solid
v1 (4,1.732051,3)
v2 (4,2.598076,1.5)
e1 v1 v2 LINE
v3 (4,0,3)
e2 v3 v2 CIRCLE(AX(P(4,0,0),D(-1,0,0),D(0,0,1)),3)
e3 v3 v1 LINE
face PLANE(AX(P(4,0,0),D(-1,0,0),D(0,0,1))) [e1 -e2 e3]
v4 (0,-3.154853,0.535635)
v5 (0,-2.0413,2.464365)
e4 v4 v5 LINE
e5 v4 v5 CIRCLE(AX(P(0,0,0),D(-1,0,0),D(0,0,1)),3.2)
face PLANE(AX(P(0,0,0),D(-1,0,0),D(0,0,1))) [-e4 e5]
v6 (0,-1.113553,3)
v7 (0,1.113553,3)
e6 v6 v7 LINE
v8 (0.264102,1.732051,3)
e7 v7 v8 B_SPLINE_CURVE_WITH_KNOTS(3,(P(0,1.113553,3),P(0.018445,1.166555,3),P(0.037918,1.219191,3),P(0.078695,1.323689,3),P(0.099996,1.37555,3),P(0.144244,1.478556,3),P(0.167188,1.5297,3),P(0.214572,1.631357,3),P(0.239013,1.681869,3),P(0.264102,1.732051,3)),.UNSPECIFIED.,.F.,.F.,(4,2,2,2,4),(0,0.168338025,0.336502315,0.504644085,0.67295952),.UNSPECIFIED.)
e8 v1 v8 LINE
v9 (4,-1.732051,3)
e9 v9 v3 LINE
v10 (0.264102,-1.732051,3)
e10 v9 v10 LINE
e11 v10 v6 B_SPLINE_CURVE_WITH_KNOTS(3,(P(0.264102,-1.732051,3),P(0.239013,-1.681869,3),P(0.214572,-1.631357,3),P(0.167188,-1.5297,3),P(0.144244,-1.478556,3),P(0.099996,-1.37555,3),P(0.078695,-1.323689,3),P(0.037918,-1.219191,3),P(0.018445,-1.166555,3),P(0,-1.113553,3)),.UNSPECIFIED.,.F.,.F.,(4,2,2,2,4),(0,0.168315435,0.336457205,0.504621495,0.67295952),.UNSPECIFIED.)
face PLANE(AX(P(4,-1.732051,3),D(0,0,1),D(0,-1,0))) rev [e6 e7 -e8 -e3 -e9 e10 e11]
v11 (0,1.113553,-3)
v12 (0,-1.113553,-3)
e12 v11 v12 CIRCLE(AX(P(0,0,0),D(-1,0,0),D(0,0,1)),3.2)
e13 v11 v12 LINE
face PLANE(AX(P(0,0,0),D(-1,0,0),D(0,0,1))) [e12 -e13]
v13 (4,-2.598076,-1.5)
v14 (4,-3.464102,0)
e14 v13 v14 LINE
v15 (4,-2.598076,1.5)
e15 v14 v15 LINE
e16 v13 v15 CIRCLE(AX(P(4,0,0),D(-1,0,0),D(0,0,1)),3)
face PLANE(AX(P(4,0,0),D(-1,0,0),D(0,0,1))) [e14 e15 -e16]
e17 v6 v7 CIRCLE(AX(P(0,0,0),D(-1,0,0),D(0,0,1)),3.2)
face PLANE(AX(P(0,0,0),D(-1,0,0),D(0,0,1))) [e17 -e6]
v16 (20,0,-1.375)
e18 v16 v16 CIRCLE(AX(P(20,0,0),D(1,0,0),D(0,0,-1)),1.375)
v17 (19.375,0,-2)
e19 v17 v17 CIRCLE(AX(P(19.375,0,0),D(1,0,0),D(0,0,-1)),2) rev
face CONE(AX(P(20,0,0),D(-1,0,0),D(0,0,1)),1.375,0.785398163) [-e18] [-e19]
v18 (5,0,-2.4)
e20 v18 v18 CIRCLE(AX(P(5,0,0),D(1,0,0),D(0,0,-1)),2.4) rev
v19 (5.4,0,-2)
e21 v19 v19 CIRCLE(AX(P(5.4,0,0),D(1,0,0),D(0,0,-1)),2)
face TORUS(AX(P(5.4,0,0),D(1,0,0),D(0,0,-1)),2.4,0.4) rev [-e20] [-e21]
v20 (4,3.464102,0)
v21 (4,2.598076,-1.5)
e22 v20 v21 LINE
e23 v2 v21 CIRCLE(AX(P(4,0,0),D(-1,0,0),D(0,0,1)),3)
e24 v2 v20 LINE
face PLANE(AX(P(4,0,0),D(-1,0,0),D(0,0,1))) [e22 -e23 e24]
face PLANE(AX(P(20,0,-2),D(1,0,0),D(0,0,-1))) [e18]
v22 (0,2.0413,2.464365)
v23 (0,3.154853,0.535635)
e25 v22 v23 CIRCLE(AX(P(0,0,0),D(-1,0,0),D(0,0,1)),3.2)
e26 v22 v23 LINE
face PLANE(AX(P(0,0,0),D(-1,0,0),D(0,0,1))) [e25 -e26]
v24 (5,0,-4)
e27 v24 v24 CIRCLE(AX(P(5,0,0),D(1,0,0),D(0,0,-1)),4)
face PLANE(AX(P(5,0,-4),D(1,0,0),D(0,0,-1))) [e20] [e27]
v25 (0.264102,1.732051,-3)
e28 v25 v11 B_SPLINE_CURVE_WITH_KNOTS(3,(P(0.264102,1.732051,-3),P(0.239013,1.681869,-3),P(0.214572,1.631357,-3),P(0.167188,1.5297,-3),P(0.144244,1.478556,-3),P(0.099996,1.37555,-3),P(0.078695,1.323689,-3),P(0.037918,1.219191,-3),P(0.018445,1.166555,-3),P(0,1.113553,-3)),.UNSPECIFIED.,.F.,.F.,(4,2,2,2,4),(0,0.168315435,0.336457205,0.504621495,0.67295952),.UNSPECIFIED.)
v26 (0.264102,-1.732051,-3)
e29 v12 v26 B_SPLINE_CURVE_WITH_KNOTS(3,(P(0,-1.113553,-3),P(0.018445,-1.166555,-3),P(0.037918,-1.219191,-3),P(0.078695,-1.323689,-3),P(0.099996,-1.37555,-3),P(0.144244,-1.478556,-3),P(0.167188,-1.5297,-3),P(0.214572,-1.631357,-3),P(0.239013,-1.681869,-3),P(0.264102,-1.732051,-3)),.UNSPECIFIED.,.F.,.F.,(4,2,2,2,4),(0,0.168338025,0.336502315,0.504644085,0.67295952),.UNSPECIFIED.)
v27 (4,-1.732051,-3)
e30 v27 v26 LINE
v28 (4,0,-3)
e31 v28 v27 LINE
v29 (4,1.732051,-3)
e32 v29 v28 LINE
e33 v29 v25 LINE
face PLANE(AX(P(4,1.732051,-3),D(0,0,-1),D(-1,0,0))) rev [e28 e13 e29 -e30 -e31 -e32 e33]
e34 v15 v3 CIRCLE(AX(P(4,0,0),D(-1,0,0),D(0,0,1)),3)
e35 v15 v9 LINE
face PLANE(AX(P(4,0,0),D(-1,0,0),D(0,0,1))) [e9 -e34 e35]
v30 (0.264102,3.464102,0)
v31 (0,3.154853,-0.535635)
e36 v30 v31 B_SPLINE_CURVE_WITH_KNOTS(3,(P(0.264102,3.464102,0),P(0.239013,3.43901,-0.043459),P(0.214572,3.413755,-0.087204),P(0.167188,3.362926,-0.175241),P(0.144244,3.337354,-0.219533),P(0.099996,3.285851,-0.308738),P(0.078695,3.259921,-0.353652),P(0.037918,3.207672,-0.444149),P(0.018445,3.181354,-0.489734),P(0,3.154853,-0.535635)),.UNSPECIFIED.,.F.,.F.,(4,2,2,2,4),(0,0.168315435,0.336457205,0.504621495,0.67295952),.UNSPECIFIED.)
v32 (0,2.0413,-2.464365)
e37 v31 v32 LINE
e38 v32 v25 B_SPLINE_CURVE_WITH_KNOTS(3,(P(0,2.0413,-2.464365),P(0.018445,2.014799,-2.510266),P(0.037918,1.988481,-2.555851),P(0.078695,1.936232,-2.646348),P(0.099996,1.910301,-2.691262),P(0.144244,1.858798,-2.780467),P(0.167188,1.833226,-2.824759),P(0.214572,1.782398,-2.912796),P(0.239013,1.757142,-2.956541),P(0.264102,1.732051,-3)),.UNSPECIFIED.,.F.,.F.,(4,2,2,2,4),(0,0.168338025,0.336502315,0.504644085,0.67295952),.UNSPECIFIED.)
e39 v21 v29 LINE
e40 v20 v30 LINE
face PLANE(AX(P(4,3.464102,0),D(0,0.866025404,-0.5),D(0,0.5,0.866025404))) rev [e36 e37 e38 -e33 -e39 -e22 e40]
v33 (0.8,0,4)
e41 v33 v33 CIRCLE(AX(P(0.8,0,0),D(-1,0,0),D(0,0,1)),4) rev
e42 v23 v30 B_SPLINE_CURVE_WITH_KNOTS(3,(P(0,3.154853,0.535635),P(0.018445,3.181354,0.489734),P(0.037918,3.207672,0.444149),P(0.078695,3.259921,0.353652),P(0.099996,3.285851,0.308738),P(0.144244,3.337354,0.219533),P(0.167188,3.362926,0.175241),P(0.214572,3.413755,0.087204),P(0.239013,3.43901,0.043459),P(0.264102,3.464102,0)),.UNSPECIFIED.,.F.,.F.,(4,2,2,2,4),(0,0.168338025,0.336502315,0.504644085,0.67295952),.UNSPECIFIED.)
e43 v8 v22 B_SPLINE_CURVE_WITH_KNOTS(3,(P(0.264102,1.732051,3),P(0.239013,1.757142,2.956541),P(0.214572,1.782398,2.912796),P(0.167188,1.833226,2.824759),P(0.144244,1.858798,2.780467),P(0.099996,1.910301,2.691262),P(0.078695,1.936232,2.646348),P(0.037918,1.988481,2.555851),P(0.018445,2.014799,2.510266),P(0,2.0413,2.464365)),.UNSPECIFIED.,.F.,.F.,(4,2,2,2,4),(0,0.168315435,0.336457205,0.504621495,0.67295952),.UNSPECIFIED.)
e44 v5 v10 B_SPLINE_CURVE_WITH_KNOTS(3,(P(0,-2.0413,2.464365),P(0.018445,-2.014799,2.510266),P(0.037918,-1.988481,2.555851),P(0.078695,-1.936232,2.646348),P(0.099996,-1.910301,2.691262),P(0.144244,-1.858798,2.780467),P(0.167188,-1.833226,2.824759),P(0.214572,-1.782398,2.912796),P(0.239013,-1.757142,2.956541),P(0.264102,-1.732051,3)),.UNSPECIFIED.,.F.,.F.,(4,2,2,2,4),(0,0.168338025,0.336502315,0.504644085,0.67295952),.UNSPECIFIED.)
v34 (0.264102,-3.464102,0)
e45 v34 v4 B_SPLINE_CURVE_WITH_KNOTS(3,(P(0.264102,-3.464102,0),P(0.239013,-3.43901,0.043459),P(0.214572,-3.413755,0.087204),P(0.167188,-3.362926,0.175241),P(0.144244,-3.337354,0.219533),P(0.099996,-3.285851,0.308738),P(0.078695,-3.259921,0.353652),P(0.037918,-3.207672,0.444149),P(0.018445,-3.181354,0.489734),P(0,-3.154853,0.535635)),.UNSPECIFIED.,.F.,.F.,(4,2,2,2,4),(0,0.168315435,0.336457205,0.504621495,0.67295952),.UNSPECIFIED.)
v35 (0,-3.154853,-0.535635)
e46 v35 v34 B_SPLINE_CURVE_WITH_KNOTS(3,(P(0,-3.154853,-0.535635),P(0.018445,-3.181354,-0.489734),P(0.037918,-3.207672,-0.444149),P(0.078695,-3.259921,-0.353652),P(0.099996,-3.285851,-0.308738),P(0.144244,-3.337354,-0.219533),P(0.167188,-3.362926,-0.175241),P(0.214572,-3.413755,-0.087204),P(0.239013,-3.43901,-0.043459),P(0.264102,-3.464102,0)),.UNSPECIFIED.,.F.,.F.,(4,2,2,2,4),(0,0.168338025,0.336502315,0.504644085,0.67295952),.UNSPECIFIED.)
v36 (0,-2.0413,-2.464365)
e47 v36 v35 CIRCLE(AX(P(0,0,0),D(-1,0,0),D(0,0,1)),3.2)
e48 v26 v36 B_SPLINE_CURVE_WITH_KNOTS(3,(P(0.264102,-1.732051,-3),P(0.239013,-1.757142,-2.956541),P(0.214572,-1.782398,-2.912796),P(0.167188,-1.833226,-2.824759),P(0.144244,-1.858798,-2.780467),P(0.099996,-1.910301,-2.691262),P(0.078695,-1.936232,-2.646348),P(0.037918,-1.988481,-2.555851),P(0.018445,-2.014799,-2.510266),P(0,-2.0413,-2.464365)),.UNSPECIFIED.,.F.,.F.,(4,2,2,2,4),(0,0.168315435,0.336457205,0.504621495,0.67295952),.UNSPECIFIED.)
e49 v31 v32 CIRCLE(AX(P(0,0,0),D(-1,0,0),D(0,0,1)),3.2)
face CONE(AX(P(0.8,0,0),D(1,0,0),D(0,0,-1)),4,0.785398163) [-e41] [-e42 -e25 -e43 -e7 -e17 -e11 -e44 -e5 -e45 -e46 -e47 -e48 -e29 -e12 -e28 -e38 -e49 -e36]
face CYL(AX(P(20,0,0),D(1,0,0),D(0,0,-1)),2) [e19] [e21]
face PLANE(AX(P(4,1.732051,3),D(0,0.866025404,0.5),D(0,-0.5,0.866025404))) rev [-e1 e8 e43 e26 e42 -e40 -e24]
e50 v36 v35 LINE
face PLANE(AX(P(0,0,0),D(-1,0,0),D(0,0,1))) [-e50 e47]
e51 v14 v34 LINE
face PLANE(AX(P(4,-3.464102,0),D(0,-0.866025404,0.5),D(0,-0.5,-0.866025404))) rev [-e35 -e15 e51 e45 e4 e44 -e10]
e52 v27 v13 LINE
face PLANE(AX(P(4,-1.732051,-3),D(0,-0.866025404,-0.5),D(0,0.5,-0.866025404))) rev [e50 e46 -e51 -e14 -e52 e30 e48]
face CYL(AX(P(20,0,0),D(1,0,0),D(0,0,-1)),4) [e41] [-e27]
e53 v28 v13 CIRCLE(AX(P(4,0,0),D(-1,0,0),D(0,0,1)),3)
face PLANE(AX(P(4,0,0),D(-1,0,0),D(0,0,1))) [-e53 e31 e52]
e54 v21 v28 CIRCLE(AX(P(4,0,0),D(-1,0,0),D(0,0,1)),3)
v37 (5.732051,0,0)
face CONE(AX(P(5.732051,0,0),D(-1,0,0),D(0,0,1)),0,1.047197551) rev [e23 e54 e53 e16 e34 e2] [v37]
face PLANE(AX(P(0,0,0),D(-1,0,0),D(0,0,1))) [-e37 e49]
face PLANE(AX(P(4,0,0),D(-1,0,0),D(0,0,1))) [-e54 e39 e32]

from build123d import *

# Parameters (mm, degrees)
CHAMFER1_SIZE      = 0.625
CUT_EXTRUDE1_DEPTH = 4
CHAMFER2_SIZE      = 0.8
FILLET1_R          = 0.4


with BuildPart() as part:
    # Sketch1 → Revolve1 (revolve)
    with BuildSketch(Plane(origin=(0, 0, 0), x_dir=(1, 0, 0), z_dir=(0, 1, 0))):
        Polygon((0, 0), (0, 4), (5, 4), (5, 2), (20, 2), (20, 0), align=None)
    revolve(axis=Axis((20, 0, 0), (-1, 0, 0)))

    # Chamfer1
    chamfer1_edges = [part.edges().sort_by_distance(p)[0] for p in [
        (20, 0, 2),
    ]]
    chamfer(chamfer1_edges, length=CHAMFER1_SIZE)

    # Sketch3 → Cut-Revolve1 (revolve, cut)
    with BuildSketch(Plane(origin=(0, 0, 0), x_dir=(1, 0, 0), z_dir=(0, 1, 0)), mode=Mode.PRIVATE) as cut_revolve1_sk:
        Polygon((0, 0), (5.732050808, 0), (4, 3), (0, 3), align=None)
    revolve(cut_revolve1_sk.sketch.rotate(Axis((0, 0, 0), (1, 0, 0)), 180), axis=Axis((0, 0, 0), (1, 0, 0)), mode=Mode.SUBTRACT)

    # Sketch2 → Cut-Extrude1 (cut)
    with BuildSketch(Plane.ZY):
        Polygon((0, 3.464101615), (-3, 1.732050808), (-3, -1.732050808), (0, -3.464101615), (3, -1.732050808), (3, 1.732050808), align=None)
    extrude(amount=-CUT_EXTRUDE1_DEPTH, mode=Mode.SUBTRACT)

    # Chamfer2
    # the kernel refuses this chamfer: 0.8 mm, written as the material it takes off along each edge
    with BuildSketch(Plane(origin=(0, 0, 0), x_dir=(0, 0, -1), z_dir=(0, 1, 0))) as chamfer2_piece_1:
        Polygon((4, -CHAMFER2_SIZE), (4 - CHAMFER2_SIZE, 0), (4, 0), align=None)
    revolve(axis=Axis((0, 0, 0), (-1, 0, 0)), mode=Mode.SUBTRACT)

    # Fillet1
    fillet1_edges = [part.edges().sort_by_distance(p)[0] for p in [
        (5, 0, 2),
    ]]
    fillet(fillet1_edges, radius=FILLET1_R)


solid = part.part
